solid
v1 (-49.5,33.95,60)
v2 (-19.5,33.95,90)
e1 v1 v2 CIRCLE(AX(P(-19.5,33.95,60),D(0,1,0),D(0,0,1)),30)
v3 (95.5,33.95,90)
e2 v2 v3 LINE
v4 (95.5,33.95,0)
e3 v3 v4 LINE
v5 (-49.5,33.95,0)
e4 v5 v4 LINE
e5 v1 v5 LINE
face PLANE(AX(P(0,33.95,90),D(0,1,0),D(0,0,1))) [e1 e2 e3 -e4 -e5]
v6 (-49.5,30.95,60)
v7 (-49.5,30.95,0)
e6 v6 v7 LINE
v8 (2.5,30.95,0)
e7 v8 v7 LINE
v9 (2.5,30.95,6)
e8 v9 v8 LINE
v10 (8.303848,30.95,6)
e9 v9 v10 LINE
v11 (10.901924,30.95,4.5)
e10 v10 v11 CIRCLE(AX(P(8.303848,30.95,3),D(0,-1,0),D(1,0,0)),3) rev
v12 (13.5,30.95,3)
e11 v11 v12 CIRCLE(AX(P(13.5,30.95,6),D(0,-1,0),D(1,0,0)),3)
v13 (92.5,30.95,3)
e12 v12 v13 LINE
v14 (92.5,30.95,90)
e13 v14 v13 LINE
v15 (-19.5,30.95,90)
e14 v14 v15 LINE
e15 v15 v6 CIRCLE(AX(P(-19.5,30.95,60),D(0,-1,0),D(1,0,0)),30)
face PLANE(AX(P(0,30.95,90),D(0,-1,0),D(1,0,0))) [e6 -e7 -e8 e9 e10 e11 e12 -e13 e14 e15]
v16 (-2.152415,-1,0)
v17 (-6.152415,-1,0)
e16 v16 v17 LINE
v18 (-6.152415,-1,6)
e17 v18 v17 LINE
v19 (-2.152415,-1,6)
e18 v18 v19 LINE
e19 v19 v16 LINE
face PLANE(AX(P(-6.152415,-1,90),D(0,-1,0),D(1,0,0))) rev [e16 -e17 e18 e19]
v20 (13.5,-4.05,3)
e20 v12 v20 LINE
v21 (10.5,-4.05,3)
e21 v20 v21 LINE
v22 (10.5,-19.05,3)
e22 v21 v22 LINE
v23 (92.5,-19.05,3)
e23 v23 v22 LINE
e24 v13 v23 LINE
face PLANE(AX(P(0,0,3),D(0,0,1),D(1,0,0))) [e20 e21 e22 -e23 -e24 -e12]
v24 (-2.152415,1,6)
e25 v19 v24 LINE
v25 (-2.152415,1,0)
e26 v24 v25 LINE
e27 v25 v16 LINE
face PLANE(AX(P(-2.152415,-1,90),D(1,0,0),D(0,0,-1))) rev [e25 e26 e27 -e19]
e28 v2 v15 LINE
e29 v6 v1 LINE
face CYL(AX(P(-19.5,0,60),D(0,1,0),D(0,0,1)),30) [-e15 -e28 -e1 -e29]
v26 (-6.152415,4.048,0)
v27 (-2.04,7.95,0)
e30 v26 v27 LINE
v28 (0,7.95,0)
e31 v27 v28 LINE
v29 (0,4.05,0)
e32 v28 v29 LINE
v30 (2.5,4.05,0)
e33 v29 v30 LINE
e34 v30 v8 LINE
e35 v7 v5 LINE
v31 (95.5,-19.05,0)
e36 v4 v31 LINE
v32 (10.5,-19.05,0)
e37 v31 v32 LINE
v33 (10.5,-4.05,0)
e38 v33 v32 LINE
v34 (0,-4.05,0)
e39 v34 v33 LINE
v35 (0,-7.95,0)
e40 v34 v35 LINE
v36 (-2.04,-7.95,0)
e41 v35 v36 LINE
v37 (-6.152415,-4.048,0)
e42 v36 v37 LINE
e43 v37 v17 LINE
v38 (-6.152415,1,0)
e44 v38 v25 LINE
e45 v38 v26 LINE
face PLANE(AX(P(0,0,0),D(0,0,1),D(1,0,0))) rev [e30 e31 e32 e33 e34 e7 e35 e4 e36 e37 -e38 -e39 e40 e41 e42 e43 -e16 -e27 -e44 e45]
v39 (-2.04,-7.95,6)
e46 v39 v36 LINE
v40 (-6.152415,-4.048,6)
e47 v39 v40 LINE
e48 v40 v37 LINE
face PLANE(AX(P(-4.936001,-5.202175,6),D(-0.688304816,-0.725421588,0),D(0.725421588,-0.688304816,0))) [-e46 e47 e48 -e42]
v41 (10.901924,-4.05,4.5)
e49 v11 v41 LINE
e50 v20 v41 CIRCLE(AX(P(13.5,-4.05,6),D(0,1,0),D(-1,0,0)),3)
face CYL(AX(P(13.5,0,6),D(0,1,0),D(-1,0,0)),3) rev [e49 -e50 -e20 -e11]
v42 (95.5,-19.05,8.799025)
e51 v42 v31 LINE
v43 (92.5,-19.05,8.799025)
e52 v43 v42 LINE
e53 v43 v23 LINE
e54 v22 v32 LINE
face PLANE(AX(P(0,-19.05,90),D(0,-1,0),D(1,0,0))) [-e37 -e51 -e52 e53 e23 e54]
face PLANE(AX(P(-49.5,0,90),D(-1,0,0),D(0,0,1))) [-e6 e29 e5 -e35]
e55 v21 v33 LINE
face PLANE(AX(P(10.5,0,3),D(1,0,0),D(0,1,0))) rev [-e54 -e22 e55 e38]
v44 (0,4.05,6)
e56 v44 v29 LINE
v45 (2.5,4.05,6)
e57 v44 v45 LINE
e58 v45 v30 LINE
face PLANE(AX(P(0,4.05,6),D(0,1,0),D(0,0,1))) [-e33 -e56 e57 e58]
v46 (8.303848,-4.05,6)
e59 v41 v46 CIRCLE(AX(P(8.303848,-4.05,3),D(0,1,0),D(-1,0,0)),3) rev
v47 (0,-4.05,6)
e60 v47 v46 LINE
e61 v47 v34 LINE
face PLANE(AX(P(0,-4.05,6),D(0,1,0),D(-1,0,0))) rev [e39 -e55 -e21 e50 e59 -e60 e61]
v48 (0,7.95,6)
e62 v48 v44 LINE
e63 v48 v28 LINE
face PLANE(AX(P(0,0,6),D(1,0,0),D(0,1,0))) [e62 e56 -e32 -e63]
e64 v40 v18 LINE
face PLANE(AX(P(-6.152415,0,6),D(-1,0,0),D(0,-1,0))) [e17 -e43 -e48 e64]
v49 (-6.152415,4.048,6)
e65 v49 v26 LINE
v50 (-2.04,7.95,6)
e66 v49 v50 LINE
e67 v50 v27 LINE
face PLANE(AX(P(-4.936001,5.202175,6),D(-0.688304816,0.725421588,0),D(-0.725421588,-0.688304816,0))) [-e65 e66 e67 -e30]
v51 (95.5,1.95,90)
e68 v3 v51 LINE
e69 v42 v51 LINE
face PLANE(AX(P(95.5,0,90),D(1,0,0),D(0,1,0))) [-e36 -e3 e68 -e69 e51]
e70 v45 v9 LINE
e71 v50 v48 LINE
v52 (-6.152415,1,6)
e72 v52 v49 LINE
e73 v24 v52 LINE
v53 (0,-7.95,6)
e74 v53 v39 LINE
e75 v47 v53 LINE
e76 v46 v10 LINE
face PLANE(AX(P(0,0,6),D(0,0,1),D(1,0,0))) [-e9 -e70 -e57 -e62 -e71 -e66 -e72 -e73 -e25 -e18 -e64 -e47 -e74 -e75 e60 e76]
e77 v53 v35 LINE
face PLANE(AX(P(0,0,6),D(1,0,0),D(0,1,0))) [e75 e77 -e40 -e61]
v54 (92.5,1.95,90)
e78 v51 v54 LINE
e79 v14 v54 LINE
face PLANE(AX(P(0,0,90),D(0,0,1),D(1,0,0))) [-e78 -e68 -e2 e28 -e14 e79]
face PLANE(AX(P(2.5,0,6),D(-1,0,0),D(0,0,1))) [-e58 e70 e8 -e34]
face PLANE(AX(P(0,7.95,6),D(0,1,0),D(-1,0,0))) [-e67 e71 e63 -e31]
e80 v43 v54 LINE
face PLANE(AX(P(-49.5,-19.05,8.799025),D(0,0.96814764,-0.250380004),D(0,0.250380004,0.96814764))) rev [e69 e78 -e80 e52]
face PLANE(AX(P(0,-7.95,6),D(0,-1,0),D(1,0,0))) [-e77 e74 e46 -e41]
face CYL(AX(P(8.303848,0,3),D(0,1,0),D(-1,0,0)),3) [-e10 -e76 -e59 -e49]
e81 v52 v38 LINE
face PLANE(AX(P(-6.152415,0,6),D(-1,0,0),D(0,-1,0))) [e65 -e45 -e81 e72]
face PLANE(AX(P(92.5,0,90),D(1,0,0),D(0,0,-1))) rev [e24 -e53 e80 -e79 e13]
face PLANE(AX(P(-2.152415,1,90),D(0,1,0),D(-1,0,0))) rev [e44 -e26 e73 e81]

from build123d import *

# Parameters (mm, degrees)
BOSS_EXTRUDE1_DEPTH = 6
BOSS_EXTRUDE2_DEPTH = 90
BOSS_EXTRUDE3_DEPTH = 3
FILLET1_R           = 3
FILLET2_R           = 3
FILLET3_R           = 30
SKETCH4_W           = 4
SKETCH4_H           = 2
CUT_EXTRUDE1_DEPTH  = 136.546495779
CUT_EXTRUDE2_DEPTH  = 175.004604959


with BuildPart() as part:
    # Sketch2 → Boss-Extrude1 (new body)
    with BuildSketch(Plane.XY):
        Polygon((2.5, 4.05), (0, 4.05), (0, -4.05), (10.5, -4.05), (10.5, 30.95), (2.5, 30.95), align=None)
        Polygon((-2.04, 7.95), (0, 7.95), (0, -7.95), (-2.04, -7.95), (-6.152414984, -4.048), (-6.152414984, 4.048), align=None)
    extrude(amount=BOSS_EXTRUDE1_DEPTH)

    # Sketch2<3> → Boss-Extrude2 (add)
    with BuildSketch(Plane.XY):
        Polygon((-49.5, 30.95), (92.5, 30.95), (92.5, -19.05), (95.5, -19.05), (95.5, 33.95), (-49.5, 33.95), align=None)
    extrude(amount=BOSS_EXTRUDE2_DEPTH)

    # Sketch2<4> → Boss-Extrude3 (add)
    with BuildSketch(Plane.XY):
        Polygon((10.5, 30.95), (10.5, -4.05), (10.5, -19.05), (92.5, -19.05), (92.5, 30.95), (30.5, 30.95), align=None)
    extrude(amount=BOSS_EXTRUDE3_DEPTH)

    # Fillet1
    fillet1_edges = [part.edges().sort_by_distance(p)[0] for p in [
        (10.5, 13.45, 3),
    ]]
    fillet(fillet1_edges, radius=FILLET1_R - 0.0001)  # a hair under: the kernel refuses the full size

    # Fillet2
    fillet2_edges = [part.edges().sort_by_distance(p)[0] for p in [
        (10.5, 13.45, 6),
    ]]
    fillet(fillet2_edges, radius=FILLET2_R)

    # Fillet3
    fillet3_edges = [part.edges().sort_by_distance(p)[0] for p in [
        (-49.5, 32.45, 90),
    ]]
    fillet(fillet3_edges, radius=FILLET3_R)

    # Sketch4 → Cut-Extrude1 (cut, through all)
    with BuildSketch(Plane(origin=(0, 0, 0), x_dir=(-1, 0, 0), z_dir=(0, 0, -1))):
        with Locations((4.152414984, 0)):
            Rectangle(SKETCH4_W, SKETCH4_H)
    extrude(amount=-CUT_EXTRUDE1_DEPTH, mode=Mode.SUBTRACT)

    # Sketch5 → Cut-Extrude2 (cut, through all)
    with BuildSketch(Plane(origin=(95.5, 0, 0), x_dir=(0, 0, -1), z_dir=(1, 0, 0))):
        Polygon((-8.799025007, -19.05), (-90, 1.95), (-90, -19.05), align=None)
    extrude(amount=-CUT_EXTRUDE2_DEPTH, mode=Mode.SUBTRACT)


solid = part.part
